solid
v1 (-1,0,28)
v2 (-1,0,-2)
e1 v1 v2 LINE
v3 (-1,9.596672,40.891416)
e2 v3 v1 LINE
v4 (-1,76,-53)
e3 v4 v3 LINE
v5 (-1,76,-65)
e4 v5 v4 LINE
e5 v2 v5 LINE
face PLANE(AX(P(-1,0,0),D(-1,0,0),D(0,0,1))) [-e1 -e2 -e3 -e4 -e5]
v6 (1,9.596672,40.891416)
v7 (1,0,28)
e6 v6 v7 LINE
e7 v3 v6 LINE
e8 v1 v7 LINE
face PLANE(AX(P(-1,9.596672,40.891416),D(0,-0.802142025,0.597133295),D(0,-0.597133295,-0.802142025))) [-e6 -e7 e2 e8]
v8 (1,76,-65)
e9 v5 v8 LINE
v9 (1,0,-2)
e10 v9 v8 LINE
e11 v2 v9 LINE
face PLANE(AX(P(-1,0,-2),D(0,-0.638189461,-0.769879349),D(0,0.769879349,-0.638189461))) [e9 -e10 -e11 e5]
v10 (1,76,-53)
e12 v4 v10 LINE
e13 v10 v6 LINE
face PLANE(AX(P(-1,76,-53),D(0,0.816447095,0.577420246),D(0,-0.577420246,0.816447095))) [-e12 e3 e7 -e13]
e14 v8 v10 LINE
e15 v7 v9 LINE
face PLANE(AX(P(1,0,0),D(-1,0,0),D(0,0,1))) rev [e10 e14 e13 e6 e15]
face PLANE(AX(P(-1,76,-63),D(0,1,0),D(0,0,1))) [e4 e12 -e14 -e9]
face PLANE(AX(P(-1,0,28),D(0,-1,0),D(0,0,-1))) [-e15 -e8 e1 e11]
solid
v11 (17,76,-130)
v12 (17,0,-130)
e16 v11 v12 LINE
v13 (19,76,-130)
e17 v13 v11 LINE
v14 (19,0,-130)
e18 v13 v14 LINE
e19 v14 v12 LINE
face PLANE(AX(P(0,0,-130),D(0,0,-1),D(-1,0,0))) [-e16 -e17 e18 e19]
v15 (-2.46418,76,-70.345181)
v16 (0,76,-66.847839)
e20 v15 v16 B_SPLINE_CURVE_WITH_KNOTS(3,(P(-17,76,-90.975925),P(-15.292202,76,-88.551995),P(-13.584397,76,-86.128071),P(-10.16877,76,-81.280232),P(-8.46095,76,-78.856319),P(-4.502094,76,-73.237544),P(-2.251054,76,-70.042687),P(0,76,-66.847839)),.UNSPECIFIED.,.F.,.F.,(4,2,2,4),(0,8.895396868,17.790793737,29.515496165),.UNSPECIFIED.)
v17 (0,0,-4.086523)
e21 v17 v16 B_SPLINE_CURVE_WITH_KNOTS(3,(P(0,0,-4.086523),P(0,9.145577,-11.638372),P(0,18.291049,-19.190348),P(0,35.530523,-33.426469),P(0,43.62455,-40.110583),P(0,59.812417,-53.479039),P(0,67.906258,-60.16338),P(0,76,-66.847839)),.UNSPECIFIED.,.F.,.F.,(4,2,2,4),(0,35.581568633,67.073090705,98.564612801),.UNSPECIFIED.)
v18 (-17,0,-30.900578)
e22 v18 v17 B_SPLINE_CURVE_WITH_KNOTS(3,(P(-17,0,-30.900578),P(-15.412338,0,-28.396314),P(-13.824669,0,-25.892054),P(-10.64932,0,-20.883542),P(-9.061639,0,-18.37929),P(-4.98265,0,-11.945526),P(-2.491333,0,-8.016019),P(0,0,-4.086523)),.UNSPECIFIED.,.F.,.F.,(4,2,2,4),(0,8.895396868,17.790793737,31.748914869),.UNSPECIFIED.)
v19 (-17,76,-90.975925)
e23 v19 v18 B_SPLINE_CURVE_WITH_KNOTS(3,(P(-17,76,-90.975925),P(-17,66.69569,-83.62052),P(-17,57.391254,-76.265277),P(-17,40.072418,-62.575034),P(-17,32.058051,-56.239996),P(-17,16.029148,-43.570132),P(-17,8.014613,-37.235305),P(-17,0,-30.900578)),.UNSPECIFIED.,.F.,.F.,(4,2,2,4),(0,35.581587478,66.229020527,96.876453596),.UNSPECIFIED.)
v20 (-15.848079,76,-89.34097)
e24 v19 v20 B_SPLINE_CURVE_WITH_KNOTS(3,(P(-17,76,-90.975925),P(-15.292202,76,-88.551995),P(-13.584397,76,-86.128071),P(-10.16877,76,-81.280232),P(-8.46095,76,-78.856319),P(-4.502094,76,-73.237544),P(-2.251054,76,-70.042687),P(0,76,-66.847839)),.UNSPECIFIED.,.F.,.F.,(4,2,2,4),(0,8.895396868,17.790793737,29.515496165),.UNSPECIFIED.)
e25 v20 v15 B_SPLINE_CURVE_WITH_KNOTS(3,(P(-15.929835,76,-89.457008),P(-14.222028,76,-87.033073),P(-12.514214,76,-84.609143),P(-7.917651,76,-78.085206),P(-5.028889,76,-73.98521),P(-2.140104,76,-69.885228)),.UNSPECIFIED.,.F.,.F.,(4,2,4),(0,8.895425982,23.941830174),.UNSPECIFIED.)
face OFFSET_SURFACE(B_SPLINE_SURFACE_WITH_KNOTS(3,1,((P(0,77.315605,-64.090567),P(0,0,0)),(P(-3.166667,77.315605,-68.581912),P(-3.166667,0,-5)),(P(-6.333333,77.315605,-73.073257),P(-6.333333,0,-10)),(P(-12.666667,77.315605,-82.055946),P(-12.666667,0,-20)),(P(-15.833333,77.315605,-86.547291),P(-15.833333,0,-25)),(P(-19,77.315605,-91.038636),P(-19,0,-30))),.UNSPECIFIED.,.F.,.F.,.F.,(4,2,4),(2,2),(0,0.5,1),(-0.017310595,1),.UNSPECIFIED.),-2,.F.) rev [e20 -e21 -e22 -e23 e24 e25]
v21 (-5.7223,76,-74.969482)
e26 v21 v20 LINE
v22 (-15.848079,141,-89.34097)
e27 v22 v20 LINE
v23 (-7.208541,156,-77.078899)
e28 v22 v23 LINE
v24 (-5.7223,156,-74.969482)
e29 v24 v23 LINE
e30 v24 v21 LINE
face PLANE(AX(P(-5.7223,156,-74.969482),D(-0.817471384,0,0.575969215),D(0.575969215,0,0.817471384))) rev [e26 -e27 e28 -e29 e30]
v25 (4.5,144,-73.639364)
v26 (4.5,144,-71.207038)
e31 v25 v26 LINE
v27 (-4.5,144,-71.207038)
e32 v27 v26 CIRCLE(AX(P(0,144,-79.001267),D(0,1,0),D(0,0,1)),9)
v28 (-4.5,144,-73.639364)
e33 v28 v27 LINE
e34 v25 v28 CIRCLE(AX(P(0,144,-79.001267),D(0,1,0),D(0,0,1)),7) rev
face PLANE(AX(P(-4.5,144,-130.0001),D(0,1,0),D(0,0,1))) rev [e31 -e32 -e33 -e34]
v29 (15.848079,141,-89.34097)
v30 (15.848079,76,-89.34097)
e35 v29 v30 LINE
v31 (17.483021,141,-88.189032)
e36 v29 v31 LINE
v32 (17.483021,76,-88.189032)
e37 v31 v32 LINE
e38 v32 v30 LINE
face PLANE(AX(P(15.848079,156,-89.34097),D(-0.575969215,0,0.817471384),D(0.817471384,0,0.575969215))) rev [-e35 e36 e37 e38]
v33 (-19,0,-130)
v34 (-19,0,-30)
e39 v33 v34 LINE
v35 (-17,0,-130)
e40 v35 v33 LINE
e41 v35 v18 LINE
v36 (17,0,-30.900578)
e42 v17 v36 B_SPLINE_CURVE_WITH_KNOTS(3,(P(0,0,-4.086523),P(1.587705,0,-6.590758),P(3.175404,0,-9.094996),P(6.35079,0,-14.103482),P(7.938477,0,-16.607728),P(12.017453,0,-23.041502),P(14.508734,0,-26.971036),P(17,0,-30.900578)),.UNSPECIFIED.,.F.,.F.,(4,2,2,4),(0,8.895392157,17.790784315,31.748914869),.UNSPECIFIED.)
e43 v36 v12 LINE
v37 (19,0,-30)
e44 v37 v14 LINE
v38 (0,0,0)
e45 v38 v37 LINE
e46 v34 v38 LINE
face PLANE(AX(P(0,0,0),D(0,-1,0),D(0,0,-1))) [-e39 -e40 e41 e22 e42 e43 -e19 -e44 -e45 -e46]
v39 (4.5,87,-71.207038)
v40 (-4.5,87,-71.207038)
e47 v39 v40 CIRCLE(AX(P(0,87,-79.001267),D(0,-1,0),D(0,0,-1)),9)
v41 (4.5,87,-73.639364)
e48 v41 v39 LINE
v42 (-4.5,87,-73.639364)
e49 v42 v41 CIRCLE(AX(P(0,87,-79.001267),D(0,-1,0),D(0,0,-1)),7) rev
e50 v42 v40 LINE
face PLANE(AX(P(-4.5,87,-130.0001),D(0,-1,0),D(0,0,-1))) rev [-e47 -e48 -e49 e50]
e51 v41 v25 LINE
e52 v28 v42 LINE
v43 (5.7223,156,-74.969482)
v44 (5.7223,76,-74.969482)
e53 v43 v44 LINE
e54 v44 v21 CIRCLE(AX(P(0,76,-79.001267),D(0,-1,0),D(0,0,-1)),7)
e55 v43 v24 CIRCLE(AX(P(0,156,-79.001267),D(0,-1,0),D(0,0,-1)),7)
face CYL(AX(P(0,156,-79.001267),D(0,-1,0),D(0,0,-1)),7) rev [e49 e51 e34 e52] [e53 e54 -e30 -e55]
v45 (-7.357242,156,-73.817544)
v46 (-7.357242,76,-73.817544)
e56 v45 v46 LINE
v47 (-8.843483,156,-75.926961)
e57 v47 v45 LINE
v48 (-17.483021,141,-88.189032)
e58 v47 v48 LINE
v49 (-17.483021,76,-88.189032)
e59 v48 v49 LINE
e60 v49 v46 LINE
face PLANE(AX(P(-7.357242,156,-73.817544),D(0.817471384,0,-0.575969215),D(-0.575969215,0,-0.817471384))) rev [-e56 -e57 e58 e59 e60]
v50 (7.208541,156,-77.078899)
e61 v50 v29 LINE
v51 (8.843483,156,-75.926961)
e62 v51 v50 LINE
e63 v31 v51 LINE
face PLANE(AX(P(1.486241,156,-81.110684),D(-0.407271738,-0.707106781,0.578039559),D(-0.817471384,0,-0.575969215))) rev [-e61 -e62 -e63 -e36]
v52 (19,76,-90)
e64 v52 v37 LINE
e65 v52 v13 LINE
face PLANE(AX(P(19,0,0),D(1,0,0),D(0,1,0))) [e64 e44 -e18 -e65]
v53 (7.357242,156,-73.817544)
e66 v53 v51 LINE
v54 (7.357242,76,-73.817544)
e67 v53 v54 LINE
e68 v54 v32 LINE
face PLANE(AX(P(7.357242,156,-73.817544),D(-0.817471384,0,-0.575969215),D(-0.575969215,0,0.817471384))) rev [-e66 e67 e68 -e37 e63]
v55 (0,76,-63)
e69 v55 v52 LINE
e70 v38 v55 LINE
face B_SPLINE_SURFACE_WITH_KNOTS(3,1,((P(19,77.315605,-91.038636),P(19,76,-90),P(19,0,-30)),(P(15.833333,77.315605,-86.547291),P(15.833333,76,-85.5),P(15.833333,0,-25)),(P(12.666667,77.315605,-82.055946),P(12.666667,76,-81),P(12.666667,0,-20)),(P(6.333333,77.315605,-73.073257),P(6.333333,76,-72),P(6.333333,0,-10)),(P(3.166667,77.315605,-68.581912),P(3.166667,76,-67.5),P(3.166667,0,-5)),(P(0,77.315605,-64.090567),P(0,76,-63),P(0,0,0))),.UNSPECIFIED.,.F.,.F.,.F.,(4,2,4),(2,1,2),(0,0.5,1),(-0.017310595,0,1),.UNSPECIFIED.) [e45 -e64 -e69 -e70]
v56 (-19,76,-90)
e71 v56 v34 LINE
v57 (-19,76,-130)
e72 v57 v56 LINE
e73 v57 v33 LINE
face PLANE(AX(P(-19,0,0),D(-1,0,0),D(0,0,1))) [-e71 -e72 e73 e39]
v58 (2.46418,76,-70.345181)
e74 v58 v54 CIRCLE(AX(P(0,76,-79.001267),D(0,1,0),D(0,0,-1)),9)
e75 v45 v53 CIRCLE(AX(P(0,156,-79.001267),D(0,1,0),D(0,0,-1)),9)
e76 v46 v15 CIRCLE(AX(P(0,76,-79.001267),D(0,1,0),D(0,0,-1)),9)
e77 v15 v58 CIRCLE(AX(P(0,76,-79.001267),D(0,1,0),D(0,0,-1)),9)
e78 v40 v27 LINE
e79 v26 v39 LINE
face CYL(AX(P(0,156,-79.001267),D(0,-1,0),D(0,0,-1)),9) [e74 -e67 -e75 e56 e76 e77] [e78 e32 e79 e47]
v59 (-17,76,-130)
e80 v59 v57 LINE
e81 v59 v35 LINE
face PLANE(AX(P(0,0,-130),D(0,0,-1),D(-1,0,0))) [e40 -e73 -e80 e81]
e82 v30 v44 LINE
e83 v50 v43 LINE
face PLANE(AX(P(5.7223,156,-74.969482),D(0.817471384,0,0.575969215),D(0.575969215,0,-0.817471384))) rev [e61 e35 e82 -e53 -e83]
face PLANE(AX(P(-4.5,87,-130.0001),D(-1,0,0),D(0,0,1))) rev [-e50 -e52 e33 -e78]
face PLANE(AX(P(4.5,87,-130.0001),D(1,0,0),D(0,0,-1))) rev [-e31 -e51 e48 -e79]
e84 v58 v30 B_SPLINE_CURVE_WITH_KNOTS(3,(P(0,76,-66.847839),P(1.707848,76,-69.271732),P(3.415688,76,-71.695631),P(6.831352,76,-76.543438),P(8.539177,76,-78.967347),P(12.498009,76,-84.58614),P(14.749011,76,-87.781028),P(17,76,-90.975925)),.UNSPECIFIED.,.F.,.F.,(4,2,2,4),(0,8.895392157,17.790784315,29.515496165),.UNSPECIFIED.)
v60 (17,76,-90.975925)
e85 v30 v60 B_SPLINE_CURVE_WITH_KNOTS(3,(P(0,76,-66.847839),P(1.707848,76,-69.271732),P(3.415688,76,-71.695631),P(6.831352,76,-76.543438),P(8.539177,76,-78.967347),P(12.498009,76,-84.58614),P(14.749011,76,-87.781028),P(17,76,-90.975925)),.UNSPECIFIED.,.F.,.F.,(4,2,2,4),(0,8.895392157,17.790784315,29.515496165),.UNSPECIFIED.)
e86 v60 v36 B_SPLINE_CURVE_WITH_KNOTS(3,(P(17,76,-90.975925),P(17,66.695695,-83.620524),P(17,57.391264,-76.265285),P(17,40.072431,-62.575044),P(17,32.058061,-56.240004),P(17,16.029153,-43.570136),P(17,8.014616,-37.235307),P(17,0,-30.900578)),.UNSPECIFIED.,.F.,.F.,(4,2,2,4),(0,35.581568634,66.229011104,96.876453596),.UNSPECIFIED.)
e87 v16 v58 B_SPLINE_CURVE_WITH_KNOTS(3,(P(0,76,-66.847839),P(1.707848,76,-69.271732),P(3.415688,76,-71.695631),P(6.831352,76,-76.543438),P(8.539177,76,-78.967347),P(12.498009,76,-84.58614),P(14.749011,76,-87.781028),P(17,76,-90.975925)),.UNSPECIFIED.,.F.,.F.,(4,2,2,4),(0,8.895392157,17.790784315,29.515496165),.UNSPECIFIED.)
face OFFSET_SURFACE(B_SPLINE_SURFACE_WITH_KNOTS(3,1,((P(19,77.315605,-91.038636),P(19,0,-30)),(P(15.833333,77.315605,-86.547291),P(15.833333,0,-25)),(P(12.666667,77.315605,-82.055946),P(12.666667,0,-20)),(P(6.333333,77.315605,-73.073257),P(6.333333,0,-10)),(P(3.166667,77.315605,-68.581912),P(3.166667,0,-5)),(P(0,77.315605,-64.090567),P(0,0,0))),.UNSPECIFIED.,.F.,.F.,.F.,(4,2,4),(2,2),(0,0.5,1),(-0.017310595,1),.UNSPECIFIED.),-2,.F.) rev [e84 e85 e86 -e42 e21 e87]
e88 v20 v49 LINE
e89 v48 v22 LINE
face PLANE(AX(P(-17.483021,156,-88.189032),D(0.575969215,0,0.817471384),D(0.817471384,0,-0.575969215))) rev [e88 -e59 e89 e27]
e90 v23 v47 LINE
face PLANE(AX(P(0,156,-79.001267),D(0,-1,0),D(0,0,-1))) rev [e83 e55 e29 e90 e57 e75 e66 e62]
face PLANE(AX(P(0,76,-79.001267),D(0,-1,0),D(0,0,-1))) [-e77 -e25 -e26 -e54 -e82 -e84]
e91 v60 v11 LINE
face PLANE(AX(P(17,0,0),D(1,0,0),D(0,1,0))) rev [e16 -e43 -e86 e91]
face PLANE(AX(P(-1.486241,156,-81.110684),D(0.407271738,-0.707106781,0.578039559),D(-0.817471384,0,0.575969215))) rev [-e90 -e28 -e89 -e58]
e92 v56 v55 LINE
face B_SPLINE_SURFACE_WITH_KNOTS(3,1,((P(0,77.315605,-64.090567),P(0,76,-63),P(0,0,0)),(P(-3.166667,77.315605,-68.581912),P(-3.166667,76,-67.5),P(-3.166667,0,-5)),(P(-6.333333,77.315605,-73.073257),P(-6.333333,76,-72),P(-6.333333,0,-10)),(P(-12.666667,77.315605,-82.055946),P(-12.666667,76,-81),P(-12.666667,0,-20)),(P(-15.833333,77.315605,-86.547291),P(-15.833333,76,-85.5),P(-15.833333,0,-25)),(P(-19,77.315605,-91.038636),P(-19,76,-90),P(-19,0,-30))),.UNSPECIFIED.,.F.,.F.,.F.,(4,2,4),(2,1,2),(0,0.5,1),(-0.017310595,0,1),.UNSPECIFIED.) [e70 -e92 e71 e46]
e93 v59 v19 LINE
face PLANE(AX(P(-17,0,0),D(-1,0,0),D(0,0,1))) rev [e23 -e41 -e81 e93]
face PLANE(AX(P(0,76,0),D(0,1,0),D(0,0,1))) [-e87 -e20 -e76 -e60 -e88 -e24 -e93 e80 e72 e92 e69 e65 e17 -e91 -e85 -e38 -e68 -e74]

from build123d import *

# Parameters (mm, degrees)
SHELL_1_T                = -2
EXTRUDE_1_DEPTH          = 1
EXTRUDE_1_DEPTH_BACK     = 1
MOVE_START               = -1
MOVE_FACE_1_DEPTH        = 2
EXTRUDE_2_DEPTH          = 80
CHAMFER_1_SIZE           = 15
CUT_EXTRUDE_1_DEPTH      = 204.953426129
CUT_EXTRUDE_1_DEPTH_BACK = 204.953426129
SKETCH_5_W               = 9
SKETCH_5_H               = 57


# Read off the part's stored shape, not the designer's step: Переместить грань1
with BuildPart() as part:
    # Эскиз2 → По сечениям2 section 0
    with BuildSketch(Plane(origin=(0, 76, 0), x_dir=(1, 0, 0), z_dir=(0, 1, 0))):
        with BuildLine():
            Line((-19, 130), (19, 130))
            Line((19, 130), (19, 90))
            Line((19, 90), (0, 63))
            Line((0, 63), (-19, 90))
            Line((-19, 90), (-19, 130))
        make_face()
    # Эскиз1 → По сечениям2 section 1
    with BuildSketch(Plane(origin=(0, 0, 0), x_dir=(1, 0, 0), z_dir=(0, 1, 0))):
        with BuildLine():
            Line((0, 0), (19, 30))
            Line((19, 30), (19, 130))
            Line((19, 130), (-19, 130))
            Line((-19, 130), (-19, 30))
            Line((-19, 30), (0, 0))
        make_face()
    loft()

    # Оболочка1
    shell_1_openings = [part.faces().sort_by_distance(p)[0] for p in [
        (0, 0, -72.173913043),
        (0, 76, -102.682242991),
        (0, 38, -130),
    ]]
    offset(amount=SHELL_1_T, openings=shell_1_openings, kind=Kind.INTERSECTION)

    # Эскиз4 → Бобышка-Вытянуть2 (add)
    with BuildSketch(Plane(origin=(0, 76, 0), x_dir=(1, 0, 0), z_dir=(0, 1, 0))):
        with BuildLine():
            Line((5.722299686, 74.96948221), (15.84807873, 89.340970111))
            Line((15.84807873, 89.340970111), (17.483021498, 88.189031681))
            Line((17.483021498, 88.189031681), (7.357242454, 73.81754378))
            ThreePointArc((7.357242454, 73.81754378), (0, 70.001266716), (-7.357242454, 73.81754378))
            Line((-7.357242454, 73.81754378), (-17.483021498, 88.189031681))
            Line((-17.483021498, 88.189031681), (-15.84807873, 89.340970111))
            Line((-15.84807873, 89.340970111), (-5.722299686, 74.96948221))
            ThreePointArc((-5.722299686, 74.96948221), (0, 72.001266716), (5.722299686, 74.96948221))
        make_face()
    extrude(amount=EXTRUDE_2_DEPTH)

    # Фаска1
    chamfer_1_edges = [part.edges().sort_by_distance(p)[0] for p in [
        (-16.665550114, 156, -88.765000896),
        (16.665550114, 156, -88.765000896),
    ]]
    chamfer(chamfer_1_edges, length=CHAMFER_1_SIZE)

    # Эскиз5 → Вырез-Вытянуть1 (cut, two sides: drawn at the far end of the back side and taken through both)
    with BuildSketch(Plane.XY.offset(-CUT_EXTRUDE_1_DEPTH_BACK)):
        with Locations((0, 115.5)):
            Rectangle(SKETCH_5_W, SKETCH_5_H)
    extrude(amount=CUT_EXTRUDE_1_DEPTH + CUT_EXTRUDE_1_DEPTH_BACK, mode=Mode.SUBTRACT)


with BuildPart() as body_2:
    # Эскиз3 → Бобышка-Вытянуть1 (new, two sides: drawn at the far end of the back side and taken through both)
    with BuildSketch(Plane(origin=(0, 0, 0), x_dir=(0, 0, -1), z_dir=(1, 0, 0)).offset(-EXTRUDE_1_DEPTH_BACK)):
        Polygon((63, 76), (53, 76), (-40.891415979, 9.596671729), (-28, 0), (0, 0), align=None)
    extrude(amount=EXTRUDE_1_DEPTH + EXTRUDE_1_DEPTH_BACK)

    # Move Face 1 outline → Move Face 1 (add)
    with BuildSketch(Plane.YZ.offset(MOVE_START)):
        Polygon((0, 0), (0, -2), (76, -65), (76, -63), align=None)
    extrude(amount=MOVE_FACE_1_DEPTH)


solid = Compound([part.part, body_2.part])
